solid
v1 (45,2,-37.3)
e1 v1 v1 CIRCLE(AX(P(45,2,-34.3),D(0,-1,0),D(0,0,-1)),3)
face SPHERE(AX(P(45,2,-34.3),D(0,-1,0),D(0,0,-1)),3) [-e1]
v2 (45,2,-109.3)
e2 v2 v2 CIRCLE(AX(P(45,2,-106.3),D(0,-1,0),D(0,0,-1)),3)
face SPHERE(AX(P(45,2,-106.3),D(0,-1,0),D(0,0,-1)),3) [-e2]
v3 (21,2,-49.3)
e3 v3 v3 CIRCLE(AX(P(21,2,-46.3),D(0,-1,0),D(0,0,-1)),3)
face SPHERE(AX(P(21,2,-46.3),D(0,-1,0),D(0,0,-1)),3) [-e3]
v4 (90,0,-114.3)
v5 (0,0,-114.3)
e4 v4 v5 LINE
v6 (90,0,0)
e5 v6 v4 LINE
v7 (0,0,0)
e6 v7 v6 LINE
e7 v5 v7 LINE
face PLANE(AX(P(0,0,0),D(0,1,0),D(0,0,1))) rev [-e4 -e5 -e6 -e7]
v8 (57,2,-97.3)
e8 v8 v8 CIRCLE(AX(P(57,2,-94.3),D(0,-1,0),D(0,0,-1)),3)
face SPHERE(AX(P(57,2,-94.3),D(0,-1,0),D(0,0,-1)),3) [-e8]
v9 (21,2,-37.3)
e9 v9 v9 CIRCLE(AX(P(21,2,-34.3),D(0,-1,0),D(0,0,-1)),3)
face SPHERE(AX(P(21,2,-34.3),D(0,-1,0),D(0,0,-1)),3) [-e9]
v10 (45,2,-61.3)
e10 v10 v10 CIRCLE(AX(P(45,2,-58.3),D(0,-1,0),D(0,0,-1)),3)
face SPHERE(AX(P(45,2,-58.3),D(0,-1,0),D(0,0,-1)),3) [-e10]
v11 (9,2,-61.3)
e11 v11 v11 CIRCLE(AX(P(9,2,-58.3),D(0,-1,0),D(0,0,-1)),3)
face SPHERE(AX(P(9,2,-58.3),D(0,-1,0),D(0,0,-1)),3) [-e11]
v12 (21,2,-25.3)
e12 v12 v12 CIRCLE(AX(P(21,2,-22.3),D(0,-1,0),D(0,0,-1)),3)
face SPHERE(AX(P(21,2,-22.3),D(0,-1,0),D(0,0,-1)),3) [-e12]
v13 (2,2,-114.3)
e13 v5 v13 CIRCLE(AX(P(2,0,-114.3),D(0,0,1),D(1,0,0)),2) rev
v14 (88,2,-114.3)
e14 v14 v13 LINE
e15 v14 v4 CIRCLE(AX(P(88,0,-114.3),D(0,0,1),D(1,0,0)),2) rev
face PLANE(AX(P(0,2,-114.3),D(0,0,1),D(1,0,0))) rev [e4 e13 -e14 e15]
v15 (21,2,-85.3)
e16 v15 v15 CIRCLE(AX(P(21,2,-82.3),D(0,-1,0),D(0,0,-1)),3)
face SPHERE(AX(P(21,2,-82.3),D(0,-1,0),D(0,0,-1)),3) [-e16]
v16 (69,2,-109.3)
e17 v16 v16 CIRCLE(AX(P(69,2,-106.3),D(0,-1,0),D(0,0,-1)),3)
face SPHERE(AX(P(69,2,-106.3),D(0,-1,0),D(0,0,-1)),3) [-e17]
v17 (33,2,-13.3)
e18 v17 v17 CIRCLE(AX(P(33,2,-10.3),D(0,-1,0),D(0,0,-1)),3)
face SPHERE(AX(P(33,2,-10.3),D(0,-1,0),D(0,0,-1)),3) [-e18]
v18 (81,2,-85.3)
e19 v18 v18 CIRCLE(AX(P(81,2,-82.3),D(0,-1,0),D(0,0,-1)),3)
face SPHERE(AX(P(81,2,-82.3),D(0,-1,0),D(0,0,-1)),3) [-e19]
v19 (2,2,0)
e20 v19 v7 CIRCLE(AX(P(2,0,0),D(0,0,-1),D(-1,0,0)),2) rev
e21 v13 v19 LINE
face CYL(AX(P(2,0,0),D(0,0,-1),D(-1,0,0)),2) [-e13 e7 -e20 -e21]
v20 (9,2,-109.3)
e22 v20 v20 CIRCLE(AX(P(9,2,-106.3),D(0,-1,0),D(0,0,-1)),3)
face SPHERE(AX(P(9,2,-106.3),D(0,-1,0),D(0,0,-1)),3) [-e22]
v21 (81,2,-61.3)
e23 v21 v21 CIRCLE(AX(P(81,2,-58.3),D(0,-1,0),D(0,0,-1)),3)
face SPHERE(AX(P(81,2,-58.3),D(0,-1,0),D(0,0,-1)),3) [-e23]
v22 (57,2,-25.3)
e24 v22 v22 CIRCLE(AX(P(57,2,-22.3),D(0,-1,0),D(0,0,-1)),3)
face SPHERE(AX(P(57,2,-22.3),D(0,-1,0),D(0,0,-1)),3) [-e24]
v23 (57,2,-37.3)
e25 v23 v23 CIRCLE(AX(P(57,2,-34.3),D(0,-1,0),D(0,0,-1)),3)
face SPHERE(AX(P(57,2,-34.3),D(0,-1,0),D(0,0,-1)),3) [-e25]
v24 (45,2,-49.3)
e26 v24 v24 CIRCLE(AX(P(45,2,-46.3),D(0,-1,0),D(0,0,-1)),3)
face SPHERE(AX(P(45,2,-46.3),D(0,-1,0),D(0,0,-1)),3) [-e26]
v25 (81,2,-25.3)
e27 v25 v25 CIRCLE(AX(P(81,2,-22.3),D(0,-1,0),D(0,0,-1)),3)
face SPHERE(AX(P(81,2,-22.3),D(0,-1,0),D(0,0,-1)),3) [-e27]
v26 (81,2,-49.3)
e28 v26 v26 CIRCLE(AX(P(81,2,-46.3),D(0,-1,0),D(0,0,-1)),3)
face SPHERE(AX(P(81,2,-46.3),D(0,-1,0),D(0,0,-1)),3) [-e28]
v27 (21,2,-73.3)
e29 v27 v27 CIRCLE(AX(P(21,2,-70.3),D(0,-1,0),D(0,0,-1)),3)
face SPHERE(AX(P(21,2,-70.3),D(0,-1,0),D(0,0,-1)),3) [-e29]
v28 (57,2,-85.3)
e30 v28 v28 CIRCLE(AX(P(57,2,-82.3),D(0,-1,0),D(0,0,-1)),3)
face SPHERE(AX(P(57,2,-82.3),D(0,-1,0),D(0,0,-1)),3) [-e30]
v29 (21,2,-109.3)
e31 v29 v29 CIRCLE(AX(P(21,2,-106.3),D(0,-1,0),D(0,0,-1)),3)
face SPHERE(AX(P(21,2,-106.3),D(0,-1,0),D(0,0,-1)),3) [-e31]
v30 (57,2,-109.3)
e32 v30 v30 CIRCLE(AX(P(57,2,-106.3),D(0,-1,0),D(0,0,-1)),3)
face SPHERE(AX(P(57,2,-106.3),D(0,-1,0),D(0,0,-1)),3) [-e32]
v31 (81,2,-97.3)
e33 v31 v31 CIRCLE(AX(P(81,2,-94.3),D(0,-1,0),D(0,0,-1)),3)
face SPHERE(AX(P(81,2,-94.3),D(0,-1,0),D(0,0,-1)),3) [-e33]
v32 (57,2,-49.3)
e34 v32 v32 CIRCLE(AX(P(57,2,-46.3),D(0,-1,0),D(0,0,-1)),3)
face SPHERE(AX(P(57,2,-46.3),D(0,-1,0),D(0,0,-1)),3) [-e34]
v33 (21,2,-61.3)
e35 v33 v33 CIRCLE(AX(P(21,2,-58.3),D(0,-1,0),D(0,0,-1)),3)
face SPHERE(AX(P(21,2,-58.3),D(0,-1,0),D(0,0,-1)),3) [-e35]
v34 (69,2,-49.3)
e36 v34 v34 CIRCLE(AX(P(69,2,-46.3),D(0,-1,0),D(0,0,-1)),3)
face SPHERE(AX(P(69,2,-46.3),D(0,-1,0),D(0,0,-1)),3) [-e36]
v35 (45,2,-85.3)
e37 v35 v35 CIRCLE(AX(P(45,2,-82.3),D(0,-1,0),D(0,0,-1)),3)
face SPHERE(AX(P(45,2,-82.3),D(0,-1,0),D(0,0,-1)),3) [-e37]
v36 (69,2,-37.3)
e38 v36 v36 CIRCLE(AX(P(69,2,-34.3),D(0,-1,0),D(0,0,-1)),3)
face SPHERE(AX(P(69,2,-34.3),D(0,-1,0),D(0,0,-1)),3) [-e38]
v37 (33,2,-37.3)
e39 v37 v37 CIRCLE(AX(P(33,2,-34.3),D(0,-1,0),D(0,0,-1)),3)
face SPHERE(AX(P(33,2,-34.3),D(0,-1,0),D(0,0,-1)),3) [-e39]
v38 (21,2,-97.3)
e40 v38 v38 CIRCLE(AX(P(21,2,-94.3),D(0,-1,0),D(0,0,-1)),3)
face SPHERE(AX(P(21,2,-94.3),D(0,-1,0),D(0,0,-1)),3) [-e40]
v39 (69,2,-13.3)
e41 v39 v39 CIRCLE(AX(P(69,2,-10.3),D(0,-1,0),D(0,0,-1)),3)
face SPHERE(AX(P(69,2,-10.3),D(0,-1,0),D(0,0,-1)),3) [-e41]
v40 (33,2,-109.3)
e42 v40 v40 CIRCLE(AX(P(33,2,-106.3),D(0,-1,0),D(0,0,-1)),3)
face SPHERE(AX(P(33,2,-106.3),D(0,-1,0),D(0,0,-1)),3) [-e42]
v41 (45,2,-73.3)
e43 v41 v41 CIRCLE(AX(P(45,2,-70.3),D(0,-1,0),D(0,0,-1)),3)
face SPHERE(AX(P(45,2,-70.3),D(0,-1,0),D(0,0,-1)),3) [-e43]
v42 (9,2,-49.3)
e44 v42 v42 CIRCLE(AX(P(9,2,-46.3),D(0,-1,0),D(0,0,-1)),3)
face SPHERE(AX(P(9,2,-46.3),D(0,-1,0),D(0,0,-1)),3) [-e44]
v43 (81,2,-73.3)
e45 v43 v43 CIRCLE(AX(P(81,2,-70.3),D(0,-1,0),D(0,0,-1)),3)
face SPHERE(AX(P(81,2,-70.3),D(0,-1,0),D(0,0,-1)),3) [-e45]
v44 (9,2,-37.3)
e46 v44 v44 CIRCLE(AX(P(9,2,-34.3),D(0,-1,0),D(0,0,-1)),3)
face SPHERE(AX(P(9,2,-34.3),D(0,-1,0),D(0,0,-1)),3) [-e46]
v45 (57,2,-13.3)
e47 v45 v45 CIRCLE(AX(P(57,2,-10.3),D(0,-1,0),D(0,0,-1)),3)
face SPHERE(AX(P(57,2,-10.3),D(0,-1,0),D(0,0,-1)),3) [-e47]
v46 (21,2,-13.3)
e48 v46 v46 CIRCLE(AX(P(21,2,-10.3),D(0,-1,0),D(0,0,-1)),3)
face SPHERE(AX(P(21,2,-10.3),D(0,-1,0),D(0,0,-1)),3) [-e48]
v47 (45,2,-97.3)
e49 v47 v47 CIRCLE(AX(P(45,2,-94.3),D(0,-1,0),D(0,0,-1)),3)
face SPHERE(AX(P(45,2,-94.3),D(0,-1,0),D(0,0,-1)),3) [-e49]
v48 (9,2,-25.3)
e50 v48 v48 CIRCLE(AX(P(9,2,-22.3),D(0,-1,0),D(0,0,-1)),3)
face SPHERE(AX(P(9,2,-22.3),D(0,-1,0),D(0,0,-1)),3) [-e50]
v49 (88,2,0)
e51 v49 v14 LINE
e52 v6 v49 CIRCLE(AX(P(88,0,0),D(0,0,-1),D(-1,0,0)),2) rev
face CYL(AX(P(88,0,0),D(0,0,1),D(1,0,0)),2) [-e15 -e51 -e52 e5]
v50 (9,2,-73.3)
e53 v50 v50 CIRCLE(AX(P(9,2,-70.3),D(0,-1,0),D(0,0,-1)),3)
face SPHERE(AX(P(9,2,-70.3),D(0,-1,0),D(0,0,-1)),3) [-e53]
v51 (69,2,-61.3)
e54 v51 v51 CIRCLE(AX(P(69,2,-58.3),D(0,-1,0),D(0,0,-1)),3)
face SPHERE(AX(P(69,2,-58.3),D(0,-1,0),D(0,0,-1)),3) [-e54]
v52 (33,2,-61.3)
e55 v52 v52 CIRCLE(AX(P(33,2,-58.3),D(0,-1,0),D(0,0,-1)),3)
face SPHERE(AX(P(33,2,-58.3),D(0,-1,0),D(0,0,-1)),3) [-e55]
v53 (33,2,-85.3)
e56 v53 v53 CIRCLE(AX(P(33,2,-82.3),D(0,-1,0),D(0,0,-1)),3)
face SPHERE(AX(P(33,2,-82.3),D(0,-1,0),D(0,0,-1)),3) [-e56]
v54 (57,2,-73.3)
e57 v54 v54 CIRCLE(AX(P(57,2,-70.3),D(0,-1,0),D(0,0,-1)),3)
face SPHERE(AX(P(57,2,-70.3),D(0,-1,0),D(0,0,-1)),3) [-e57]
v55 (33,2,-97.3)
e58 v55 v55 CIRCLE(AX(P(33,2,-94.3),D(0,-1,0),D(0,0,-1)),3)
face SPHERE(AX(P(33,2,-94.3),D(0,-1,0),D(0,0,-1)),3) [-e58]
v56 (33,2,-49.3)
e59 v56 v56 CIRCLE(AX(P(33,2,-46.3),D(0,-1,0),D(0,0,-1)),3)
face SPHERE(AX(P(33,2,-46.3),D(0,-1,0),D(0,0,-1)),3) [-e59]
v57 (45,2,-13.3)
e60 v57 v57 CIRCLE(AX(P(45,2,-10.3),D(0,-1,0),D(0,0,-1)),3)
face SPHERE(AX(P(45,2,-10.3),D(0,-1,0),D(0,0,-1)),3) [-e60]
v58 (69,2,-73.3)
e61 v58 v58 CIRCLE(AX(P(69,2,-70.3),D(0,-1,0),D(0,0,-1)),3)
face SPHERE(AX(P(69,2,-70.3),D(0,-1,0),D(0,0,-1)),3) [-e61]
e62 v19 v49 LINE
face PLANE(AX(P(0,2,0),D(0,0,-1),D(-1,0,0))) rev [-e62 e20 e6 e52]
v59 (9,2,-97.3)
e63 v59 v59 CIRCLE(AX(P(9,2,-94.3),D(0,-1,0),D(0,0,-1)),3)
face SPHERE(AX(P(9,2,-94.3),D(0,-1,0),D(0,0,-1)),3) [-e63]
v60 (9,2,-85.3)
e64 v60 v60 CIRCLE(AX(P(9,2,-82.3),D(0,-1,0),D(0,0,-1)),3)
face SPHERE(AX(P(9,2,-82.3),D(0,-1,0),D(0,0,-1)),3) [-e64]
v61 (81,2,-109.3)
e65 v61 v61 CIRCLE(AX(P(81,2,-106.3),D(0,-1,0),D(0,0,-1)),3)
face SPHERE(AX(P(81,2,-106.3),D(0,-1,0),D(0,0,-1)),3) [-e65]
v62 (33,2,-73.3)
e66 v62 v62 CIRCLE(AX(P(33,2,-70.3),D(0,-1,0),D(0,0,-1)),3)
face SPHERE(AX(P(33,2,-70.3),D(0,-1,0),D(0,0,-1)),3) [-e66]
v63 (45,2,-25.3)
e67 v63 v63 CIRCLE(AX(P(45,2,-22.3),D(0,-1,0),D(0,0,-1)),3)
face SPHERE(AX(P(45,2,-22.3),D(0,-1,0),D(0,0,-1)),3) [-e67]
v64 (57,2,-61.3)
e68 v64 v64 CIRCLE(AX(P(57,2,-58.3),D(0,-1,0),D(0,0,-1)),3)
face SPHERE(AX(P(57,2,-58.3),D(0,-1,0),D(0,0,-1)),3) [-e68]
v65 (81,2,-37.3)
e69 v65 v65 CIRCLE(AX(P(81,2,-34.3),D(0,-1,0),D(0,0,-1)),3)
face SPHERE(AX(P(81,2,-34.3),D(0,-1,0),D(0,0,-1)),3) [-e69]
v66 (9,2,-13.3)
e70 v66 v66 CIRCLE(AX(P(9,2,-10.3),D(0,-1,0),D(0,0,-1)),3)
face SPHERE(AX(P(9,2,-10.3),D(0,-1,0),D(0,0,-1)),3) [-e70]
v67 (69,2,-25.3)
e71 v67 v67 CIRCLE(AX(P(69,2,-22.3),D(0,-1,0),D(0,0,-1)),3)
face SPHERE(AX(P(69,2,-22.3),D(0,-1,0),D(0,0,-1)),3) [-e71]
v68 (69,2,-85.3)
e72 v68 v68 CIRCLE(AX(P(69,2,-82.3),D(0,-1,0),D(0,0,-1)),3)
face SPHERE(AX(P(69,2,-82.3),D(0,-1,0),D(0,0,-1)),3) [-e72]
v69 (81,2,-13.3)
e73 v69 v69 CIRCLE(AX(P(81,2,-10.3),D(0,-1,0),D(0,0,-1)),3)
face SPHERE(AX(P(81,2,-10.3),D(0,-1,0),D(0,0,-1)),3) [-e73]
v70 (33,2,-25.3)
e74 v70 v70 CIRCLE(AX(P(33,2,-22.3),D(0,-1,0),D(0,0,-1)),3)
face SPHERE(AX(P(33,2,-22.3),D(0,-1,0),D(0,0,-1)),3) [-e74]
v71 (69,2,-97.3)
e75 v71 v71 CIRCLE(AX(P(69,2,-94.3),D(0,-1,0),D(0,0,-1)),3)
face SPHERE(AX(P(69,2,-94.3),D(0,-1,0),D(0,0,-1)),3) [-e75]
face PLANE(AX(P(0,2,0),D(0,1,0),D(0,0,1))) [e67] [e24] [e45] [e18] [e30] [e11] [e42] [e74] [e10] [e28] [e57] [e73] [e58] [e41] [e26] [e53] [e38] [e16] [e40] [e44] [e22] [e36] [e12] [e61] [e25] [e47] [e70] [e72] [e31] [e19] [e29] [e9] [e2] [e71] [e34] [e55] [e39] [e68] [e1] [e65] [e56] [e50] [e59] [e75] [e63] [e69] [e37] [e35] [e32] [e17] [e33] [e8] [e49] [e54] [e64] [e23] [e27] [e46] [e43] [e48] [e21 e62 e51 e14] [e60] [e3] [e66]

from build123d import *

# Parameters (mm, degrees)
SKETCH1_W            = 90
SKETCH1_H            = 114.3
BOSS_EXTRUDE1_DEPTH  = 2
REVOLVE1_ANGLE       = 180
LPATTERN1_COUNT      = 7
LPATTERN1_PITCH      = 12
LPATTERN1_COUNT_DIR2 = 9
LPATTERN1_PITCH_DIR2 = 12
FILLET1_R            = 2


with BuildPart() as part:
    # Sketch1 → Boss-Extrude1 (new body)
    with BuildSketch(Plane(origin=(0, 0, 0), x_dir=(1, 0, 0), z_dir=(0, 1, 0))):
        with Locations((45, 57.15)):
            Rectangle(SKETCH1_W, SKETCH1_H)
    extrude(amount=BOSS_EXTRUDE1_DEPTH)

    # Sketch2 → Revolve1 (revolve)
    with BuildSketch(Plane(origin=(0, 2, 0), x_dir=(1, 0, 0), z_dir=(0, 1, 0))):
        with BuildLine():
            Line((9, 109.3), (9, 103.3))
            ThreePointArc((9, 103.3), (6, 106.3), (9, 109.3))
        make_face()
    revolve1 = revolve(axis=Axis((9, 2, -110.669010132), (0, 0, -1)), revolution_arc=REVOLVE1_ANGLE)

    # LPattern1: Revolve1 7 × 9
    with Locations(*[(i * LPATTERN1_PITCH, 0, j * LPATTERN1_PITCH_DIR2) for i in range(LPATTERN1_COUNT) for j in range(LPATTERN1_COUNT_DIR2) if (i, j) != (0, 0)]):
        add(revolve1)

    # Fillet1
    fillet1_edges = [part.edges().sort_by_distance(p)[0] for p in [
        (0, 2, -57.15),
        (90, 2, -57.15),
    ]]
    fillet(fillet1_edges, radius=FILLET1_R - 0.0001)  # a hair under: the kernel refuses the full size


solid = part.part
